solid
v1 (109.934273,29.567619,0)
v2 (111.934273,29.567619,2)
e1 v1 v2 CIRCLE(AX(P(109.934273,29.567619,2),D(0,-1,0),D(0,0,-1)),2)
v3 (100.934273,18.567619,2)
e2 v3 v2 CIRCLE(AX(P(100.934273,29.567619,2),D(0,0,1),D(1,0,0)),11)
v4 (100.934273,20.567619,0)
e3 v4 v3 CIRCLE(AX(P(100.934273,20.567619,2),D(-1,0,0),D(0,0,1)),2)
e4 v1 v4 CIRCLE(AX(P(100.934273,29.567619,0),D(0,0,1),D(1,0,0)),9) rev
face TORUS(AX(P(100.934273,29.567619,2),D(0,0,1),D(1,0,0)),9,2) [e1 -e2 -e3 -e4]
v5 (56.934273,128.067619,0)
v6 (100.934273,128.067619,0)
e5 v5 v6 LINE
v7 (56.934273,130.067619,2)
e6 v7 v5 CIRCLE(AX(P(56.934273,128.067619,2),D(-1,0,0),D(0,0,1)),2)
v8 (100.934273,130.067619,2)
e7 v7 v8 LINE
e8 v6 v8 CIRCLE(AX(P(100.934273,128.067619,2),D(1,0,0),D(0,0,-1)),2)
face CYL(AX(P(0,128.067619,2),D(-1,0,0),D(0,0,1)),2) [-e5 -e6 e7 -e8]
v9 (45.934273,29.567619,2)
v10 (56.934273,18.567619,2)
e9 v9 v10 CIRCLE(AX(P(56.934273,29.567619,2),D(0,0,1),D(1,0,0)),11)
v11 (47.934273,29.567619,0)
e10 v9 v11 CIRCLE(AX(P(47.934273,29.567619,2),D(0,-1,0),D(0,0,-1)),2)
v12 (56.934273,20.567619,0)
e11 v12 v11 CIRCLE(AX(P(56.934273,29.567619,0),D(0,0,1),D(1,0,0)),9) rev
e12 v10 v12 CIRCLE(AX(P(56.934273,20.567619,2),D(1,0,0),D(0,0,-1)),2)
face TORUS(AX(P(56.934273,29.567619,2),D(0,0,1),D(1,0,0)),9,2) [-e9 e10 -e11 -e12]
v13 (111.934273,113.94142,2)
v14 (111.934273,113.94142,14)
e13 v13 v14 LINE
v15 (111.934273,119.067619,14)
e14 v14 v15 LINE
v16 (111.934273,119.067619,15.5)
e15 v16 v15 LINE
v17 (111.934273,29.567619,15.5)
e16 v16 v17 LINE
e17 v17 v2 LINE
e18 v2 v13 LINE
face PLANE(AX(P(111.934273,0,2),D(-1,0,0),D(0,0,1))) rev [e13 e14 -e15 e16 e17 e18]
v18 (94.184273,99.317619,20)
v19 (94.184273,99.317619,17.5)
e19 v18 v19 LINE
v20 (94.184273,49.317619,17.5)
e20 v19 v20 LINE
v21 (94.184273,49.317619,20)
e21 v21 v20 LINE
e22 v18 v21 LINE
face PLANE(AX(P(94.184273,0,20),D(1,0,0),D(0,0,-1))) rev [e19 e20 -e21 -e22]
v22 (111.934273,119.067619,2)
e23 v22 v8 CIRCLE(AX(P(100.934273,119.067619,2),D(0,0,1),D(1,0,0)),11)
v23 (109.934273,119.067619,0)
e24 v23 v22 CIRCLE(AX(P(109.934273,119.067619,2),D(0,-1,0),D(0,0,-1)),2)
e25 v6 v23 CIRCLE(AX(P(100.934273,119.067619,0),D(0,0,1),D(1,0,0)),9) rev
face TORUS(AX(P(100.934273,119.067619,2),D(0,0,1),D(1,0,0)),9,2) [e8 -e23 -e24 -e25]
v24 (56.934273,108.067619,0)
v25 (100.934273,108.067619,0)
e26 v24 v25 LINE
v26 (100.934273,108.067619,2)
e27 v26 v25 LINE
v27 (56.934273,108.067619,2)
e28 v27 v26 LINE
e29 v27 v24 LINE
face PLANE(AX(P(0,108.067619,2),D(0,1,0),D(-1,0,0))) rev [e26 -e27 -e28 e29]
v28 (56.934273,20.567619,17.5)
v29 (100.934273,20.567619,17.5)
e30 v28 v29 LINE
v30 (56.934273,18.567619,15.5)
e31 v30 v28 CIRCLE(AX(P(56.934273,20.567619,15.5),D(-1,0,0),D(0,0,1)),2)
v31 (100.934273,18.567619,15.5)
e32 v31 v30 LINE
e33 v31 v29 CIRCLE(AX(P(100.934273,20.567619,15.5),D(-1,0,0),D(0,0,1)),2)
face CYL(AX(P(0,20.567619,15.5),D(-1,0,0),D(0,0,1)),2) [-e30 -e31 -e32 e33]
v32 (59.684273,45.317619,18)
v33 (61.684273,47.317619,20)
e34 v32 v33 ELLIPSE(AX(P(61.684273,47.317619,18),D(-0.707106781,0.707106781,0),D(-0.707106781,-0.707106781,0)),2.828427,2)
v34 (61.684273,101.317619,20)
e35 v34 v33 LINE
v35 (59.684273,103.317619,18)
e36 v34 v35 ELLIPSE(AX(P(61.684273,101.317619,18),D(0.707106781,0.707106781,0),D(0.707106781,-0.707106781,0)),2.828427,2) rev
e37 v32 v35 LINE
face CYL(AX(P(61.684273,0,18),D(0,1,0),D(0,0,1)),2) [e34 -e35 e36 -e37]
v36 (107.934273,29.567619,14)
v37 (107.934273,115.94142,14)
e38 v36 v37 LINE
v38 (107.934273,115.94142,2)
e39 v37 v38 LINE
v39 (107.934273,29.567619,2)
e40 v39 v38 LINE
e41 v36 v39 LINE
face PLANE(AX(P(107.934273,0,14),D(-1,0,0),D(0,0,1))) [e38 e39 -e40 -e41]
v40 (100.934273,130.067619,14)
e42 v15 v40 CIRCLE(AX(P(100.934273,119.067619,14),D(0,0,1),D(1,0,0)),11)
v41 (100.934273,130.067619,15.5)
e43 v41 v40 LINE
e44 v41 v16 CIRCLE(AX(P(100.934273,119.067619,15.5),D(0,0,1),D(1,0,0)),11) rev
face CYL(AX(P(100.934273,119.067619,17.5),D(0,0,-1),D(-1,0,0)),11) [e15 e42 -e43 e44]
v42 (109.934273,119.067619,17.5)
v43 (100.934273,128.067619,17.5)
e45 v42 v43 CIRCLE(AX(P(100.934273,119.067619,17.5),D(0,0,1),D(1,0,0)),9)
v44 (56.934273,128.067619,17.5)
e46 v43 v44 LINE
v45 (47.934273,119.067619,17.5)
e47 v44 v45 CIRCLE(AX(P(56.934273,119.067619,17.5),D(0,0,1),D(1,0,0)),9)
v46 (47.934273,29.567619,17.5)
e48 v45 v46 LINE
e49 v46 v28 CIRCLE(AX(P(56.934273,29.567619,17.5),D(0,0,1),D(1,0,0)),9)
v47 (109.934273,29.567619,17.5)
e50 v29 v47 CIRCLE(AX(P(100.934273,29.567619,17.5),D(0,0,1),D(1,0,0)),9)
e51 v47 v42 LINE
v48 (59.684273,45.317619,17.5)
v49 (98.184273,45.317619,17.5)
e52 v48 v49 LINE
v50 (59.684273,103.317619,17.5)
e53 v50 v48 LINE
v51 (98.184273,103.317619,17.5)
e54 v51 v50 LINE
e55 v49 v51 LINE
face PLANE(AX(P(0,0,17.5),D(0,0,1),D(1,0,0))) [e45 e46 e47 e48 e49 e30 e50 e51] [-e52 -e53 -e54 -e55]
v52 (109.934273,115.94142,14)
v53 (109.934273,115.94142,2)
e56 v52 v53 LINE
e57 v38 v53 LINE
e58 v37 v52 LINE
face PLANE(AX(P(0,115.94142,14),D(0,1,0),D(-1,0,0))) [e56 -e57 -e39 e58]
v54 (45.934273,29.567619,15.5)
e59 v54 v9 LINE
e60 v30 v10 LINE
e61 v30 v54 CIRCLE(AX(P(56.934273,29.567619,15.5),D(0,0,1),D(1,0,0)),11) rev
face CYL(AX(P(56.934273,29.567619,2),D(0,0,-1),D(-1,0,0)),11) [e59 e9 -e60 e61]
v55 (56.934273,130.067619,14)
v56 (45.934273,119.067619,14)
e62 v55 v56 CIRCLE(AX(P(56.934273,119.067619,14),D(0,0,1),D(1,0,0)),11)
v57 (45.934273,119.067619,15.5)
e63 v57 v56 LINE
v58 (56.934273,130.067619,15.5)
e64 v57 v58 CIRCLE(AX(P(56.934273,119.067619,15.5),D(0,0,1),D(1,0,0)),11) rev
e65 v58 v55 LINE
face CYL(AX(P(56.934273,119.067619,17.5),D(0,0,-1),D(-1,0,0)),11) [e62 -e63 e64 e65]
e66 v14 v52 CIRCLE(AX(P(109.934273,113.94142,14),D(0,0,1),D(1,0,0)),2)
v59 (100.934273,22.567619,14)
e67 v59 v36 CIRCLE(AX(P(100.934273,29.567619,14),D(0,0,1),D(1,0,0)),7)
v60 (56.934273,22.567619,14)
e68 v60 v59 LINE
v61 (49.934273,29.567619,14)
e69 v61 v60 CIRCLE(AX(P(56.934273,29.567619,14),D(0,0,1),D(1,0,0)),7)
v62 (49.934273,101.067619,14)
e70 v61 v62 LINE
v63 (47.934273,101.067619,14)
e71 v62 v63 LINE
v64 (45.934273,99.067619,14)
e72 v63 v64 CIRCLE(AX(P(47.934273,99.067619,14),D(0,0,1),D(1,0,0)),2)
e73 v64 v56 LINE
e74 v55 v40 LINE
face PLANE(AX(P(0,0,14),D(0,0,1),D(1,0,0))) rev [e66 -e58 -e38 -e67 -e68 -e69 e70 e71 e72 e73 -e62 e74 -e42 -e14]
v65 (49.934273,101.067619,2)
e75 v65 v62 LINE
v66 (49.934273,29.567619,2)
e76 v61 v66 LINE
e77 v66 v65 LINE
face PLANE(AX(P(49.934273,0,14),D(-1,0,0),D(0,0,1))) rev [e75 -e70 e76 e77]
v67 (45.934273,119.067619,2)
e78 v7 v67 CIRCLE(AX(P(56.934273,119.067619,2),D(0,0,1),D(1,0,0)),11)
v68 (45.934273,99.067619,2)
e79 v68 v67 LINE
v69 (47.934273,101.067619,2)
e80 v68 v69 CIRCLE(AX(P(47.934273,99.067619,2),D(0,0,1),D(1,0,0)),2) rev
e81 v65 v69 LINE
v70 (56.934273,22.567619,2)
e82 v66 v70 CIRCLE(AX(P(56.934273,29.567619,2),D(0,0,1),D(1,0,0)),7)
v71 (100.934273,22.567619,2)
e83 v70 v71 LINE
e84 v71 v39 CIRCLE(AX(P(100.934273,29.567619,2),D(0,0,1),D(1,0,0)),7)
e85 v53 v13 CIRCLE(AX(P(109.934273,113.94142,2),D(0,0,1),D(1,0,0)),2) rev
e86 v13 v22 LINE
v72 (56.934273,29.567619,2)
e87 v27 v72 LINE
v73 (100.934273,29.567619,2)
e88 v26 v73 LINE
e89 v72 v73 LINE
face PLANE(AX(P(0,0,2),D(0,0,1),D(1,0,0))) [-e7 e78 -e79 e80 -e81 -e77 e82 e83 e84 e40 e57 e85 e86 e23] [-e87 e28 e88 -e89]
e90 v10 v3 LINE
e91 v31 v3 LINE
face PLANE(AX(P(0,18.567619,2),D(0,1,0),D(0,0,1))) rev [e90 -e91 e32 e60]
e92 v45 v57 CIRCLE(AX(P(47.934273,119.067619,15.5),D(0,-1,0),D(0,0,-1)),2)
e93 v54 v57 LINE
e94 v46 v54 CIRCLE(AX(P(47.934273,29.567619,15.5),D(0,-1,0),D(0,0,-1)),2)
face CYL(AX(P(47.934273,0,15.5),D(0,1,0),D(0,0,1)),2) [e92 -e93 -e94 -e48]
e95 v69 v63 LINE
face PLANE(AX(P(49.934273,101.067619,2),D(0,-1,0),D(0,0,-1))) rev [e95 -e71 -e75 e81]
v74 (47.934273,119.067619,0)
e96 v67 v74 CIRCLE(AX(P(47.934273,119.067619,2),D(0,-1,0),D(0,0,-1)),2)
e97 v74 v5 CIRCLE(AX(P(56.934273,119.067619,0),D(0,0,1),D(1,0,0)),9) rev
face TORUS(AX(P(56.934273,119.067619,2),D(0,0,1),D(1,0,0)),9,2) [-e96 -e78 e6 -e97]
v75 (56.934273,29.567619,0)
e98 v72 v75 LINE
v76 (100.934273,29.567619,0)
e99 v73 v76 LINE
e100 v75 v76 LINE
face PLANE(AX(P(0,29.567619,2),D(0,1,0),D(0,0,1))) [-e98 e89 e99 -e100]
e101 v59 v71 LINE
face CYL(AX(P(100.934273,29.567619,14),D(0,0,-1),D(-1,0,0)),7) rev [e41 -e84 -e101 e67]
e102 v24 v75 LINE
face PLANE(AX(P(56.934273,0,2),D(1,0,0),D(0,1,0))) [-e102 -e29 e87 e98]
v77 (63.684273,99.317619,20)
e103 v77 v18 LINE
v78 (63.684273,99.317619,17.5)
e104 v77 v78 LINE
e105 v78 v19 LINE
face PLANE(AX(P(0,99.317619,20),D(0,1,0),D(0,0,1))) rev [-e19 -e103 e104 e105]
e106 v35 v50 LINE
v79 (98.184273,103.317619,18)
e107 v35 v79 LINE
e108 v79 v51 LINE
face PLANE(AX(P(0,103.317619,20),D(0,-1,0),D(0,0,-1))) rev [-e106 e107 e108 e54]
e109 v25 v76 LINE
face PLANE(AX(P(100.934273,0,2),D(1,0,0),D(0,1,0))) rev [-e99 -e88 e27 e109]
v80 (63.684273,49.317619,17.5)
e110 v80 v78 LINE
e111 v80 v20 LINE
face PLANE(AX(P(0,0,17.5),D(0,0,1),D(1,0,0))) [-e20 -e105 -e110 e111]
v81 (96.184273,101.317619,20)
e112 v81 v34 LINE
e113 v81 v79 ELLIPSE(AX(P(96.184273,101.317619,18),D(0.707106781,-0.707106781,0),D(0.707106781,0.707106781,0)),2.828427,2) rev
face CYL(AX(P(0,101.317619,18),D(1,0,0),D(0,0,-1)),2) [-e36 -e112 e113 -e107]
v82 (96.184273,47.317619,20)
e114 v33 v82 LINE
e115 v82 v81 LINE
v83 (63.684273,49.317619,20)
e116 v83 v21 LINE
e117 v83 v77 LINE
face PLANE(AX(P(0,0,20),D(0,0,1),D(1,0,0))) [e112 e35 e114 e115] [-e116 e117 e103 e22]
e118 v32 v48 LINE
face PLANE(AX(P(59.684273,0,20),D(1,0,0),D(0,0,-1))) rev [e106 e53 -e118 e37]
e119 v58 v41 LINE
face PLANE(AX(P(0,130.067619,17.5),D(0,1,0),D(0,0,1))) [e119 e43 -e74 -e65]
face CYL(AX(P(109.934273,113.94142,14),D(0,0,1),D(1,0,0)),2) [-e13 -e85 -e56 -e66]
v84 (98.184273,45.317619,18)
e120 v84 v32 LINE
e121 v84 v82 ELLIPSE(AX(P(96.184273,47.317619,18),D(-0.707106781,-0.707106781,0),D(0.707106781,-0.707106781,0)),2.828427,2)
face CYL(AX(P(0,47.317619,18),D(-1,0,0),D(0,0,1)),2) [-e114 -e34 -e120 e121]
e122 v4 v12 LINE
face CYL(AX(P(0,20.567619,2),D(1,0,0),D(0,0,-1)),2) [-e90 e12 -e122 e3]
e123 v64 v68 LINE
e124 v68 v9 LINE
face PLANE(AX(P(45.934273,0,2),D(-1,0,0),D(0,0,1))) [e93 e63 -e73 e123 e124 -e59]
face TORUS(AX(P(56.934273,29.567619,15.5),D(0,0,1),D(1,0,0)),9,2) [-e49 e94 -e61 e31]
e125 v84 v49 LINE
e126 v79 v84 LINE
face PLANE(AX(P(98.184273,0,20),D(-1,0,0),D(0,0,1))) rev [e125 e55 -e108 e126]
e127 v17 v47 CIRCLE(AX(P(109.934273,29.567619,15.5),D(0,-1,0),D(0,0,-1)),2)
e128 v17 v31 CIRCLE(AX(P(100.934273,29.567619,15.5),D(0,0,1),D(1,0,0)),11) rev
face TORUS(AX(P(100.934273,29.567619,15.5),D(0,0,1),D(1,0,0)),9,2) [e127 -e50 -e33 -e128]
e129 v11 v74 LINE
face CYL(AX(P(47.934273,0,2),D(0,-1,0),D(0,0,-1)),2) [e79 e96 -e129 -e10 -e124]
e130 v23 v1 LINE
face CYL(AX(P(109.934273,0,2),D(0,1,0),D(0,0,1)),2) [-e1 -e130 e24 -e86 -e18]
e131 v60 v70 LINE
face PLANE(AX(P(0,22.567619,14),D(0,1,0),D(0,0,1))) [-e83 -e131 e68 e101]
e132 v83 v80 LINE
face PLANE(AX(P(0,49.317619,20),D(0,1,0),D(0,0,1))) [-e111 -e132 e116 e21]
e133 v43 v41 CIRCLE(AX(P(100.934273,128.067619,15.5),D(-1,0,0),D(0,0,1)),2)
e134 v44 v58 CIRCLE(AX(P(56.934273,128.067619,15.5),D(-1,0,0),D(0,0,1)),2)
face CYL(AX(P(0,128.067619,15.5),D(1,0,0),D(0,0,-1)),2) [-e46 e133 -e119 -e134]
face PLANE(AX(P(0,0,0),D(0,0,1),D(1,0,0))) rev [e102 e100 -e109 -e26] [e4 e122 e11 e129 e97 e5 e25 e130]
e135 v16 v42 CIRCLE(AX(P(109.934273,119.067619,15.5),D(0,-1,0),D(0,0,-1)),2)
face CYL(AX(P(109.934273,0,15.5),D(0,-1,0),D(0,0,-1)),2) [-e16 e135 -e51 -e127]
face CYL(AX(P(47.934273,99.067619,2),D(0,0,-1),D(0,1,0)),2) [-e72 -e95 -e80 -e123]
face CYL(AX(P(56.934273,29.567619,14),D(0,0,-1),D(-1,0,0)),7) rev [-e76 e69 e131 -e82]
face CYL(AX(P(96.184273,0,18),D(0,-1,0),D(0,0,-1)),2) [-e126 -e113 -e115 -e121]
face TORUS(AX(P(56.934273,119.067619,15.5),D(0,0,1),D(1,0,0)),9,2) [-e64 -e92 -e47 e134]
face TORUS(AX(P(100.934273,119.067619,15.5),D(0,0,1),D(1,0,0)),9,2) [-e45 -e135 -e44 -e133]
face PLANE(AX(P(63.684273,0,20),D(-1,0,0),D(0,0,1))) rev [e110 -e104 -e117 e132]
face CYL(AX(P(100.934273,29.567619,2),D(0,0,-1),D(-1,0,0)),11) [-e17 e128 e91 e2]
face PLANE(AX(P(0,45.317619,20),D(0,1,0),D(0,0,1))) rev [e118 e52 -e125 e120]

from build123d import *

# Parameters (mm, degrees)
CROQUIS1_W              = 44
CROQUIS1_H              = 78.5
SALIENTE_EXTRUIR1_DEPTH = 2
SALIENTE_EXTRUIR2_DEPTH = 12
CROQUIS3_W              = 44
CROQUIS3_H              = 78.5
SALIENTE_EXTRUIR3_DEPTH = 3.5
CROQUIS4_W              = 30.5
CROQUIS4_H              = 50
SALIENTE_EXTRUIR4_DEPTH = 2.5
CROQUIS6_W              = 12
CROQUIS6_H              = 14.873801133
CORTAR_EXTRUIR3_DEPTH   = 4
REDONDEO2_R             = 2
REDONDEO3_R             = 2
REDONDEO4_R             = 2
REDONDEO5_R             = 2
REDONDEO6_R             = 2


with BuildPart() as part:
    # Croquis1 → Saliente-Extruir1 (new body)
    # profile 1 of 2: a face of its own
    with BuildSketch(Plane.XY):
        with BuildLine():
            Line((45.934272818, 29.567618865), (45.934272818, 119.067618865))
            ThreePointArc((45.934272818, 119.067618865), (49.156098225, 126.845793458), (56.934272818, 130.067618865))
            Line((56.934272818, 130.067618865), (100.934272818, 130.067618865))
            ThreePointArc((100.934272818, 130.067618865), (108.712447411, 126.845793458), (111.934272818, 119.067618865))
            Line((111.934272818, 119.067618865), (111.934272818, 29.567618865))
            ThreePointArc((111.934272818, 29.567618865), (108.712447411, 21.789444272), (100.934272818, 18.567618865))
            Line((100.934272818, 18.567618865), (56.934272818, 18.567618865))
            ThreePointArc((56.934272818, 18.567618865), (49.156098225, 21.789444272), (45.934272818, 29.567618865))
        make_face()
        with BuildLine():
            ThreePointArc((56.934272818, 126.067618865), (51.98452535, 124.017366333), (49.934272818, 119.067618865))
            Line((49.934272818, 119.067618865), (49.934272818, 29.567618865))
            ThreePointArc((49.934272818, 29.567618865), (51.98452535, 24.617871397), (56.934272818, 22.567618865))
            Line((56.934272818, 22.567618865), (100.934272818, 22.567618865))
            ThreePointArc((100.934272818, 22.567618865), (105.884020287, 24.617871397), (107.934272818, 29.567618865))
            Line((107.934272818, 29.567618865), (107.934272818, 119.067618865))
            ThreePointArc((107.934272818, 119.067618865), (105.884020287, 124.017366333), (100.934272818, 126.067618865))
            Line((100.934272818, 126.067618865), (56.934272818, 126.067618865))
        make_face(mode=Mode.SUBTRACT)
    # profile 2 of 2: a face of its own
    with BuildSketch(Plane.XY):
        with BuildLine():
            Line((100.934272818, 126.067618865), (56.934272818, 126.067618865))
            ThreePointArc((56.934272818, 126.067618865), (51.98452535, 124.017366333), (49.934272818, 119.067618865))
            Line((49.934272818, 119.067618865), (49.934272818, 29.567618865))
            ThreePointArc((49.934272818, 29.567618865), (51.98452535, 24.617871397), (56.934272818, 22.567618865))
            Line((56.934272818, 22.567618865), (100.934272818, 22.567618865))
            ThreePointArc((100.934272818, 22.567618865), (105.884020287, 24.617871397), (107.934272818, 29.567618865))
            Line((107.934272818, 29.567618865), (107.934272818, 119.067618865))
            ThreePointArc((107.934272818, 119.067618865), (105.884020287, 124.017366333), (100.934272818, 126.067618865))
        make_face()
        with Locations((78.934272818, 68.817618865)):
            Rectangle(CROQUIS1_W, CROQUIS1_H, mode=Mode.SUBTRACT)
    extrude(amount=SALIENTE_EXTRUIR1_DEPTH)

    # Croquis2 → Saliente-Extruir2 (add)
    with BuildSketch(Plane.XY.offset(2)):
        with BuildLine():
            Line((100.934272818, 22.567618865), (56.934272818, 22.567618865))
            ThreePointArc((56.934272818, 22.567618865), (51.98452535, 24.617871397), (49.934272818, 29.567618865))
            Line((49.934272818, 29.567618865), (49.934272818, 115.941419998))
            Line((49.934272818, 115.941419998), (45.934272818, 115.941419998))
            Line((45.934272818, 115.941419998), (45.934272818, 29.567618865))
            ThreePointArc((45.934272818, 29.567618865), (49.156098225, 21.789444272), (56.934272818, 18.567618865))
            Line((56.934272818, 18.567618865), (100.934272818, 18.567618865))
            ThreePointArc((100.934272818, 18.567618865), (108.712447411, 21.789444272), (111.934272818, 29.567618865))
            Line((111.934272818, 29.567618865), (111.934272818, 115.941419998))
            Line((111.934272818, 115.941419998), (107.934272818, 115.941419998))
            Line((107.934272818, 115.941419998), (107.934272818, 29.567618865))
            ThreePointArc((107.934272818, 29.567618865), (105.884020287, 24.617871397), (100.934272818, 22.567618865))
        make_face()
    extrude(amount=SALIENTE_EXTRUIR2_DEPTH)

    # Croquis3 → Saliente-Extruir3 (add)
    # profile 1 of 4: a face of its own
    with BuildSketch(Plane.XY.offset(14)):
        with BuildLine():
            Line((45.934272818, 115.941419998), (49.934272818, 115.941419998))
            Line((49.934272818, 115.941419998), (49.934272818, 119.067618865))
            ThreePointArc((49.934272818, 119.067618865), (51.98452535, 124.017366333), (56.934272818, 126.067618865))
            Line((56.934272818, 126.067618865), (100.934272818, 126.067618865))
            ThreePointArc((100.934272818, 126.067618865), (105.884020287, 124.017366333), (107.934272818, 119.067618865))
            Line((107.934272818, 119.067618865), (107.934272818, 115.941419998))
            Line((107.934272818, 115.941419998), (111.934272818, 115.941419998))
            Line((111.934272818, 115.941419998), (111.934272818, 119.067618865))
            ThreePointArc((111.934272818, 119.067618865), (108.712447411, 126.845793458), (100.934272818, 130.067618865))
            Line((100.934272818, 130.067618865), (56.934272818, 130.067618865))
            ThreePointArc((56.934272818, 130.067618865), (49.156098225, 126.845793458), (45.934272818, 119.067618865))
            Line((45.934272818, 119.067618865), (45.934272818, 115.941419998))
        make_face()
    # profile 2 of 4: a face of its own
    with BuildSketch(Plane.XY.offset(14)):
        with BuildLine():
            Line((107.934272818, 115.941419998), (107.934272818, 29.567618865))
            ThreePointArc((107.934272818, 29.567618865), (105.884020287, 24.617871397), (100.934272818, 22.567618865))
            Line((100.934272818, 22.567618865), (56.934272818, 22.567618865))
            ThreePointArc((56.934272818, 22.567618865), (51.98452535, 24.617871397), (49.934272818, 29.567618865))
            Line((49.934272818, 29.567618865), (49.934272818, 115.941419998))
            Line((49.934272818, 115.941419998), (45.934272818, 115.941419998))
            Line((45.934272818, 115.941419998), (45.934272818, 29.567618865))
            ThreePointArc((45.934272818, 29.567618865), (49.156098225, 21.789444272), (56.934272818, 18.567618865))
            Line((56.934272818, 18.567618865), (100.934272818, 18.567618865))
            ThreePointArc((100.934272818, 18.567618865), (108.712447411, 21.789444272), (111.934272818, 29.567618865))
            Line((111.934272818, 29.567618865), (111.934272818, 115.941419998))
            Line((111.934272818, 115.941419998), (107.934272818, 115.941419998))
        make_face()
    # profile 3 of 4: a face of its own
    with BuildSketch(Plane.XY.offset(14)):
        with BuildLine():
            ThreePointArc((49.934272818, 29.567618865), (51.98452535, 24.617871397), (56.934272818, 22.567618865))
            Line((56.934272818, 22.567618865), (100.934272818, 22.567618865))
            ThreePointArc((100.934272818, 22.567618865), (105.884020287, 24.617871397), (107.934272818, 29.567618865))
            Line((107.934272818, 29.567618865), (107.934272818, 115.941419998))
            Line((107.934272818, 115.941419998), (107.934272818, 119.067618865))
            ThreePointArc((107.934272818, 119.067618865), (105.884020287, 124.017366333), (100.934272818, 126.067618865))
            Line((100.934272818, 126.067618865), (56.934272818, 126.067618865))
            ThreePointArc((56.934272818, 126.067618865), (51.98452535, 124.017366333), (49.934272818, 119.067618865))
            Line((49.934272818, 119.067618865), (49.934272818, 115.941419998))
            Line((49.934272818, 115.941419998), (49.934272818, 29.567618865))
        make_face()
        with Locations((78.934272818, 68.817618865)):
            Rectangle(CROQUIS3_W, CROQUIS3_H, mode=Mode.SUBTRACT)
    # profile 4 of 4: a face of its own
    with BuildSketch(Plane.XY.offset(14)):
        with Locations((78.934272818, 68.817618865)):
            Rectangle(CROQUIS3_W, CROQUIS3_H)
    extrude(amount=SALIENTE_EXTRUIR3_DEPTH)

    # Croquis4 → Saliente-Extruir4 (add)
    with BuildSketch(Plane.XY.offset(17.5)):
        Polygon((59.684272818, 103.317618865), (59.684272818, 99.317618865), (59.684272818, 45.317618865), (98.184272818, 45.317618865), (98.184272818, 103.317618865), align=None)
        with Locations((78.934272818, 74.317618865)):
            Rectangle(CROQUIS4_W, CROQUIS4_H, mode=Mode.SUBTRACT)
    extrude(amount=SALIENTE_EXTRUIR4_DEPTH)

    # Croquis6 → Cortar-Extruir3 (cut)
    with BuildSketch(Plane.ZY.offset(-45.934272818)):
        with Locations((8, 108.504519432)):
            Rectangle(CROQUIS6_W, CROQUIS6_H)
    extrude(amount=-CORTAR_EXTRUIR3_DEPTH, mode=Mode.SUBTRACT)

    # Redondeo2
    redondeo2_edges = [part.edges().sort_by_distance(p)[0] for p in [
        (78.934272818, 18.567618865, 0),
        (108.712447411, 21.789444272, 0),
        (111.934272818, 74.317618865, 0),
        (108.712447411, 126.845793458, 0),
        (78.934272818, 130.067618865, 0),
        (49.156098225, 126.845793458, 0),
        (45.934272818, 74.317618865, 0),
        (49.156098225, 21.789444272, 0),
    ]]
    fillet(redondeo2_edges, radius=REDONDEO2_R - 0.0001)  # a hair under: the kernel refuses the full size

    # Redondeo3
    redondeo3_edges = [part.edges().sort_by_distance(p)[0] for p in [
        (45.934272818, 74.317618865, 17.5),
        (78.934272818, 130.067618865, 17.5),
        (49.156098225, 21.789444272, 17.5),
        (78.934272818, 18.567618865, 17.5),
        (108.712447411, 21.789444272, 17.5),
        (111.934272818, 74.317618865, 17.5),
        (108.712447411, 126.845793458, 17.5),
        (49.156098225, 126.845793458, 17.5),
    ]]
    fillet(redondeo3_edges, radius=REDONDEO3_R)

    # Redondeo4
    redondeo4_edges = [part.edges().sort_by_distance(p)[0] for p in [
        (59.684272818, 74.317618865, 20),
        (78.934272818, 45.317618865, 20),
        (98.184272818, 74.317618865, 20),
        (78.934272818, 103.317618865, 20),
    ]]
    fillet(redondeo4_edges, radius=REDONDEO4_R)

    # Redondeo5
    redondeo5_edges = [part.edges().sort_by_distance(p)[0] for p in [
        (45.934272818, 101.067618865, 8),
    ]]
    fillet(redondeo5_edges, radius=REDONDEO5_R)

    # Redondeo6
    redondeo6_edges = [part.edges().sort_by_distance(p)[0] for p in [
        (111.934272818, 115.941419998, 8),
    ]]
    fillet(redondeo6_edges, radius=REDONDEO6_R)


solid = part.part
